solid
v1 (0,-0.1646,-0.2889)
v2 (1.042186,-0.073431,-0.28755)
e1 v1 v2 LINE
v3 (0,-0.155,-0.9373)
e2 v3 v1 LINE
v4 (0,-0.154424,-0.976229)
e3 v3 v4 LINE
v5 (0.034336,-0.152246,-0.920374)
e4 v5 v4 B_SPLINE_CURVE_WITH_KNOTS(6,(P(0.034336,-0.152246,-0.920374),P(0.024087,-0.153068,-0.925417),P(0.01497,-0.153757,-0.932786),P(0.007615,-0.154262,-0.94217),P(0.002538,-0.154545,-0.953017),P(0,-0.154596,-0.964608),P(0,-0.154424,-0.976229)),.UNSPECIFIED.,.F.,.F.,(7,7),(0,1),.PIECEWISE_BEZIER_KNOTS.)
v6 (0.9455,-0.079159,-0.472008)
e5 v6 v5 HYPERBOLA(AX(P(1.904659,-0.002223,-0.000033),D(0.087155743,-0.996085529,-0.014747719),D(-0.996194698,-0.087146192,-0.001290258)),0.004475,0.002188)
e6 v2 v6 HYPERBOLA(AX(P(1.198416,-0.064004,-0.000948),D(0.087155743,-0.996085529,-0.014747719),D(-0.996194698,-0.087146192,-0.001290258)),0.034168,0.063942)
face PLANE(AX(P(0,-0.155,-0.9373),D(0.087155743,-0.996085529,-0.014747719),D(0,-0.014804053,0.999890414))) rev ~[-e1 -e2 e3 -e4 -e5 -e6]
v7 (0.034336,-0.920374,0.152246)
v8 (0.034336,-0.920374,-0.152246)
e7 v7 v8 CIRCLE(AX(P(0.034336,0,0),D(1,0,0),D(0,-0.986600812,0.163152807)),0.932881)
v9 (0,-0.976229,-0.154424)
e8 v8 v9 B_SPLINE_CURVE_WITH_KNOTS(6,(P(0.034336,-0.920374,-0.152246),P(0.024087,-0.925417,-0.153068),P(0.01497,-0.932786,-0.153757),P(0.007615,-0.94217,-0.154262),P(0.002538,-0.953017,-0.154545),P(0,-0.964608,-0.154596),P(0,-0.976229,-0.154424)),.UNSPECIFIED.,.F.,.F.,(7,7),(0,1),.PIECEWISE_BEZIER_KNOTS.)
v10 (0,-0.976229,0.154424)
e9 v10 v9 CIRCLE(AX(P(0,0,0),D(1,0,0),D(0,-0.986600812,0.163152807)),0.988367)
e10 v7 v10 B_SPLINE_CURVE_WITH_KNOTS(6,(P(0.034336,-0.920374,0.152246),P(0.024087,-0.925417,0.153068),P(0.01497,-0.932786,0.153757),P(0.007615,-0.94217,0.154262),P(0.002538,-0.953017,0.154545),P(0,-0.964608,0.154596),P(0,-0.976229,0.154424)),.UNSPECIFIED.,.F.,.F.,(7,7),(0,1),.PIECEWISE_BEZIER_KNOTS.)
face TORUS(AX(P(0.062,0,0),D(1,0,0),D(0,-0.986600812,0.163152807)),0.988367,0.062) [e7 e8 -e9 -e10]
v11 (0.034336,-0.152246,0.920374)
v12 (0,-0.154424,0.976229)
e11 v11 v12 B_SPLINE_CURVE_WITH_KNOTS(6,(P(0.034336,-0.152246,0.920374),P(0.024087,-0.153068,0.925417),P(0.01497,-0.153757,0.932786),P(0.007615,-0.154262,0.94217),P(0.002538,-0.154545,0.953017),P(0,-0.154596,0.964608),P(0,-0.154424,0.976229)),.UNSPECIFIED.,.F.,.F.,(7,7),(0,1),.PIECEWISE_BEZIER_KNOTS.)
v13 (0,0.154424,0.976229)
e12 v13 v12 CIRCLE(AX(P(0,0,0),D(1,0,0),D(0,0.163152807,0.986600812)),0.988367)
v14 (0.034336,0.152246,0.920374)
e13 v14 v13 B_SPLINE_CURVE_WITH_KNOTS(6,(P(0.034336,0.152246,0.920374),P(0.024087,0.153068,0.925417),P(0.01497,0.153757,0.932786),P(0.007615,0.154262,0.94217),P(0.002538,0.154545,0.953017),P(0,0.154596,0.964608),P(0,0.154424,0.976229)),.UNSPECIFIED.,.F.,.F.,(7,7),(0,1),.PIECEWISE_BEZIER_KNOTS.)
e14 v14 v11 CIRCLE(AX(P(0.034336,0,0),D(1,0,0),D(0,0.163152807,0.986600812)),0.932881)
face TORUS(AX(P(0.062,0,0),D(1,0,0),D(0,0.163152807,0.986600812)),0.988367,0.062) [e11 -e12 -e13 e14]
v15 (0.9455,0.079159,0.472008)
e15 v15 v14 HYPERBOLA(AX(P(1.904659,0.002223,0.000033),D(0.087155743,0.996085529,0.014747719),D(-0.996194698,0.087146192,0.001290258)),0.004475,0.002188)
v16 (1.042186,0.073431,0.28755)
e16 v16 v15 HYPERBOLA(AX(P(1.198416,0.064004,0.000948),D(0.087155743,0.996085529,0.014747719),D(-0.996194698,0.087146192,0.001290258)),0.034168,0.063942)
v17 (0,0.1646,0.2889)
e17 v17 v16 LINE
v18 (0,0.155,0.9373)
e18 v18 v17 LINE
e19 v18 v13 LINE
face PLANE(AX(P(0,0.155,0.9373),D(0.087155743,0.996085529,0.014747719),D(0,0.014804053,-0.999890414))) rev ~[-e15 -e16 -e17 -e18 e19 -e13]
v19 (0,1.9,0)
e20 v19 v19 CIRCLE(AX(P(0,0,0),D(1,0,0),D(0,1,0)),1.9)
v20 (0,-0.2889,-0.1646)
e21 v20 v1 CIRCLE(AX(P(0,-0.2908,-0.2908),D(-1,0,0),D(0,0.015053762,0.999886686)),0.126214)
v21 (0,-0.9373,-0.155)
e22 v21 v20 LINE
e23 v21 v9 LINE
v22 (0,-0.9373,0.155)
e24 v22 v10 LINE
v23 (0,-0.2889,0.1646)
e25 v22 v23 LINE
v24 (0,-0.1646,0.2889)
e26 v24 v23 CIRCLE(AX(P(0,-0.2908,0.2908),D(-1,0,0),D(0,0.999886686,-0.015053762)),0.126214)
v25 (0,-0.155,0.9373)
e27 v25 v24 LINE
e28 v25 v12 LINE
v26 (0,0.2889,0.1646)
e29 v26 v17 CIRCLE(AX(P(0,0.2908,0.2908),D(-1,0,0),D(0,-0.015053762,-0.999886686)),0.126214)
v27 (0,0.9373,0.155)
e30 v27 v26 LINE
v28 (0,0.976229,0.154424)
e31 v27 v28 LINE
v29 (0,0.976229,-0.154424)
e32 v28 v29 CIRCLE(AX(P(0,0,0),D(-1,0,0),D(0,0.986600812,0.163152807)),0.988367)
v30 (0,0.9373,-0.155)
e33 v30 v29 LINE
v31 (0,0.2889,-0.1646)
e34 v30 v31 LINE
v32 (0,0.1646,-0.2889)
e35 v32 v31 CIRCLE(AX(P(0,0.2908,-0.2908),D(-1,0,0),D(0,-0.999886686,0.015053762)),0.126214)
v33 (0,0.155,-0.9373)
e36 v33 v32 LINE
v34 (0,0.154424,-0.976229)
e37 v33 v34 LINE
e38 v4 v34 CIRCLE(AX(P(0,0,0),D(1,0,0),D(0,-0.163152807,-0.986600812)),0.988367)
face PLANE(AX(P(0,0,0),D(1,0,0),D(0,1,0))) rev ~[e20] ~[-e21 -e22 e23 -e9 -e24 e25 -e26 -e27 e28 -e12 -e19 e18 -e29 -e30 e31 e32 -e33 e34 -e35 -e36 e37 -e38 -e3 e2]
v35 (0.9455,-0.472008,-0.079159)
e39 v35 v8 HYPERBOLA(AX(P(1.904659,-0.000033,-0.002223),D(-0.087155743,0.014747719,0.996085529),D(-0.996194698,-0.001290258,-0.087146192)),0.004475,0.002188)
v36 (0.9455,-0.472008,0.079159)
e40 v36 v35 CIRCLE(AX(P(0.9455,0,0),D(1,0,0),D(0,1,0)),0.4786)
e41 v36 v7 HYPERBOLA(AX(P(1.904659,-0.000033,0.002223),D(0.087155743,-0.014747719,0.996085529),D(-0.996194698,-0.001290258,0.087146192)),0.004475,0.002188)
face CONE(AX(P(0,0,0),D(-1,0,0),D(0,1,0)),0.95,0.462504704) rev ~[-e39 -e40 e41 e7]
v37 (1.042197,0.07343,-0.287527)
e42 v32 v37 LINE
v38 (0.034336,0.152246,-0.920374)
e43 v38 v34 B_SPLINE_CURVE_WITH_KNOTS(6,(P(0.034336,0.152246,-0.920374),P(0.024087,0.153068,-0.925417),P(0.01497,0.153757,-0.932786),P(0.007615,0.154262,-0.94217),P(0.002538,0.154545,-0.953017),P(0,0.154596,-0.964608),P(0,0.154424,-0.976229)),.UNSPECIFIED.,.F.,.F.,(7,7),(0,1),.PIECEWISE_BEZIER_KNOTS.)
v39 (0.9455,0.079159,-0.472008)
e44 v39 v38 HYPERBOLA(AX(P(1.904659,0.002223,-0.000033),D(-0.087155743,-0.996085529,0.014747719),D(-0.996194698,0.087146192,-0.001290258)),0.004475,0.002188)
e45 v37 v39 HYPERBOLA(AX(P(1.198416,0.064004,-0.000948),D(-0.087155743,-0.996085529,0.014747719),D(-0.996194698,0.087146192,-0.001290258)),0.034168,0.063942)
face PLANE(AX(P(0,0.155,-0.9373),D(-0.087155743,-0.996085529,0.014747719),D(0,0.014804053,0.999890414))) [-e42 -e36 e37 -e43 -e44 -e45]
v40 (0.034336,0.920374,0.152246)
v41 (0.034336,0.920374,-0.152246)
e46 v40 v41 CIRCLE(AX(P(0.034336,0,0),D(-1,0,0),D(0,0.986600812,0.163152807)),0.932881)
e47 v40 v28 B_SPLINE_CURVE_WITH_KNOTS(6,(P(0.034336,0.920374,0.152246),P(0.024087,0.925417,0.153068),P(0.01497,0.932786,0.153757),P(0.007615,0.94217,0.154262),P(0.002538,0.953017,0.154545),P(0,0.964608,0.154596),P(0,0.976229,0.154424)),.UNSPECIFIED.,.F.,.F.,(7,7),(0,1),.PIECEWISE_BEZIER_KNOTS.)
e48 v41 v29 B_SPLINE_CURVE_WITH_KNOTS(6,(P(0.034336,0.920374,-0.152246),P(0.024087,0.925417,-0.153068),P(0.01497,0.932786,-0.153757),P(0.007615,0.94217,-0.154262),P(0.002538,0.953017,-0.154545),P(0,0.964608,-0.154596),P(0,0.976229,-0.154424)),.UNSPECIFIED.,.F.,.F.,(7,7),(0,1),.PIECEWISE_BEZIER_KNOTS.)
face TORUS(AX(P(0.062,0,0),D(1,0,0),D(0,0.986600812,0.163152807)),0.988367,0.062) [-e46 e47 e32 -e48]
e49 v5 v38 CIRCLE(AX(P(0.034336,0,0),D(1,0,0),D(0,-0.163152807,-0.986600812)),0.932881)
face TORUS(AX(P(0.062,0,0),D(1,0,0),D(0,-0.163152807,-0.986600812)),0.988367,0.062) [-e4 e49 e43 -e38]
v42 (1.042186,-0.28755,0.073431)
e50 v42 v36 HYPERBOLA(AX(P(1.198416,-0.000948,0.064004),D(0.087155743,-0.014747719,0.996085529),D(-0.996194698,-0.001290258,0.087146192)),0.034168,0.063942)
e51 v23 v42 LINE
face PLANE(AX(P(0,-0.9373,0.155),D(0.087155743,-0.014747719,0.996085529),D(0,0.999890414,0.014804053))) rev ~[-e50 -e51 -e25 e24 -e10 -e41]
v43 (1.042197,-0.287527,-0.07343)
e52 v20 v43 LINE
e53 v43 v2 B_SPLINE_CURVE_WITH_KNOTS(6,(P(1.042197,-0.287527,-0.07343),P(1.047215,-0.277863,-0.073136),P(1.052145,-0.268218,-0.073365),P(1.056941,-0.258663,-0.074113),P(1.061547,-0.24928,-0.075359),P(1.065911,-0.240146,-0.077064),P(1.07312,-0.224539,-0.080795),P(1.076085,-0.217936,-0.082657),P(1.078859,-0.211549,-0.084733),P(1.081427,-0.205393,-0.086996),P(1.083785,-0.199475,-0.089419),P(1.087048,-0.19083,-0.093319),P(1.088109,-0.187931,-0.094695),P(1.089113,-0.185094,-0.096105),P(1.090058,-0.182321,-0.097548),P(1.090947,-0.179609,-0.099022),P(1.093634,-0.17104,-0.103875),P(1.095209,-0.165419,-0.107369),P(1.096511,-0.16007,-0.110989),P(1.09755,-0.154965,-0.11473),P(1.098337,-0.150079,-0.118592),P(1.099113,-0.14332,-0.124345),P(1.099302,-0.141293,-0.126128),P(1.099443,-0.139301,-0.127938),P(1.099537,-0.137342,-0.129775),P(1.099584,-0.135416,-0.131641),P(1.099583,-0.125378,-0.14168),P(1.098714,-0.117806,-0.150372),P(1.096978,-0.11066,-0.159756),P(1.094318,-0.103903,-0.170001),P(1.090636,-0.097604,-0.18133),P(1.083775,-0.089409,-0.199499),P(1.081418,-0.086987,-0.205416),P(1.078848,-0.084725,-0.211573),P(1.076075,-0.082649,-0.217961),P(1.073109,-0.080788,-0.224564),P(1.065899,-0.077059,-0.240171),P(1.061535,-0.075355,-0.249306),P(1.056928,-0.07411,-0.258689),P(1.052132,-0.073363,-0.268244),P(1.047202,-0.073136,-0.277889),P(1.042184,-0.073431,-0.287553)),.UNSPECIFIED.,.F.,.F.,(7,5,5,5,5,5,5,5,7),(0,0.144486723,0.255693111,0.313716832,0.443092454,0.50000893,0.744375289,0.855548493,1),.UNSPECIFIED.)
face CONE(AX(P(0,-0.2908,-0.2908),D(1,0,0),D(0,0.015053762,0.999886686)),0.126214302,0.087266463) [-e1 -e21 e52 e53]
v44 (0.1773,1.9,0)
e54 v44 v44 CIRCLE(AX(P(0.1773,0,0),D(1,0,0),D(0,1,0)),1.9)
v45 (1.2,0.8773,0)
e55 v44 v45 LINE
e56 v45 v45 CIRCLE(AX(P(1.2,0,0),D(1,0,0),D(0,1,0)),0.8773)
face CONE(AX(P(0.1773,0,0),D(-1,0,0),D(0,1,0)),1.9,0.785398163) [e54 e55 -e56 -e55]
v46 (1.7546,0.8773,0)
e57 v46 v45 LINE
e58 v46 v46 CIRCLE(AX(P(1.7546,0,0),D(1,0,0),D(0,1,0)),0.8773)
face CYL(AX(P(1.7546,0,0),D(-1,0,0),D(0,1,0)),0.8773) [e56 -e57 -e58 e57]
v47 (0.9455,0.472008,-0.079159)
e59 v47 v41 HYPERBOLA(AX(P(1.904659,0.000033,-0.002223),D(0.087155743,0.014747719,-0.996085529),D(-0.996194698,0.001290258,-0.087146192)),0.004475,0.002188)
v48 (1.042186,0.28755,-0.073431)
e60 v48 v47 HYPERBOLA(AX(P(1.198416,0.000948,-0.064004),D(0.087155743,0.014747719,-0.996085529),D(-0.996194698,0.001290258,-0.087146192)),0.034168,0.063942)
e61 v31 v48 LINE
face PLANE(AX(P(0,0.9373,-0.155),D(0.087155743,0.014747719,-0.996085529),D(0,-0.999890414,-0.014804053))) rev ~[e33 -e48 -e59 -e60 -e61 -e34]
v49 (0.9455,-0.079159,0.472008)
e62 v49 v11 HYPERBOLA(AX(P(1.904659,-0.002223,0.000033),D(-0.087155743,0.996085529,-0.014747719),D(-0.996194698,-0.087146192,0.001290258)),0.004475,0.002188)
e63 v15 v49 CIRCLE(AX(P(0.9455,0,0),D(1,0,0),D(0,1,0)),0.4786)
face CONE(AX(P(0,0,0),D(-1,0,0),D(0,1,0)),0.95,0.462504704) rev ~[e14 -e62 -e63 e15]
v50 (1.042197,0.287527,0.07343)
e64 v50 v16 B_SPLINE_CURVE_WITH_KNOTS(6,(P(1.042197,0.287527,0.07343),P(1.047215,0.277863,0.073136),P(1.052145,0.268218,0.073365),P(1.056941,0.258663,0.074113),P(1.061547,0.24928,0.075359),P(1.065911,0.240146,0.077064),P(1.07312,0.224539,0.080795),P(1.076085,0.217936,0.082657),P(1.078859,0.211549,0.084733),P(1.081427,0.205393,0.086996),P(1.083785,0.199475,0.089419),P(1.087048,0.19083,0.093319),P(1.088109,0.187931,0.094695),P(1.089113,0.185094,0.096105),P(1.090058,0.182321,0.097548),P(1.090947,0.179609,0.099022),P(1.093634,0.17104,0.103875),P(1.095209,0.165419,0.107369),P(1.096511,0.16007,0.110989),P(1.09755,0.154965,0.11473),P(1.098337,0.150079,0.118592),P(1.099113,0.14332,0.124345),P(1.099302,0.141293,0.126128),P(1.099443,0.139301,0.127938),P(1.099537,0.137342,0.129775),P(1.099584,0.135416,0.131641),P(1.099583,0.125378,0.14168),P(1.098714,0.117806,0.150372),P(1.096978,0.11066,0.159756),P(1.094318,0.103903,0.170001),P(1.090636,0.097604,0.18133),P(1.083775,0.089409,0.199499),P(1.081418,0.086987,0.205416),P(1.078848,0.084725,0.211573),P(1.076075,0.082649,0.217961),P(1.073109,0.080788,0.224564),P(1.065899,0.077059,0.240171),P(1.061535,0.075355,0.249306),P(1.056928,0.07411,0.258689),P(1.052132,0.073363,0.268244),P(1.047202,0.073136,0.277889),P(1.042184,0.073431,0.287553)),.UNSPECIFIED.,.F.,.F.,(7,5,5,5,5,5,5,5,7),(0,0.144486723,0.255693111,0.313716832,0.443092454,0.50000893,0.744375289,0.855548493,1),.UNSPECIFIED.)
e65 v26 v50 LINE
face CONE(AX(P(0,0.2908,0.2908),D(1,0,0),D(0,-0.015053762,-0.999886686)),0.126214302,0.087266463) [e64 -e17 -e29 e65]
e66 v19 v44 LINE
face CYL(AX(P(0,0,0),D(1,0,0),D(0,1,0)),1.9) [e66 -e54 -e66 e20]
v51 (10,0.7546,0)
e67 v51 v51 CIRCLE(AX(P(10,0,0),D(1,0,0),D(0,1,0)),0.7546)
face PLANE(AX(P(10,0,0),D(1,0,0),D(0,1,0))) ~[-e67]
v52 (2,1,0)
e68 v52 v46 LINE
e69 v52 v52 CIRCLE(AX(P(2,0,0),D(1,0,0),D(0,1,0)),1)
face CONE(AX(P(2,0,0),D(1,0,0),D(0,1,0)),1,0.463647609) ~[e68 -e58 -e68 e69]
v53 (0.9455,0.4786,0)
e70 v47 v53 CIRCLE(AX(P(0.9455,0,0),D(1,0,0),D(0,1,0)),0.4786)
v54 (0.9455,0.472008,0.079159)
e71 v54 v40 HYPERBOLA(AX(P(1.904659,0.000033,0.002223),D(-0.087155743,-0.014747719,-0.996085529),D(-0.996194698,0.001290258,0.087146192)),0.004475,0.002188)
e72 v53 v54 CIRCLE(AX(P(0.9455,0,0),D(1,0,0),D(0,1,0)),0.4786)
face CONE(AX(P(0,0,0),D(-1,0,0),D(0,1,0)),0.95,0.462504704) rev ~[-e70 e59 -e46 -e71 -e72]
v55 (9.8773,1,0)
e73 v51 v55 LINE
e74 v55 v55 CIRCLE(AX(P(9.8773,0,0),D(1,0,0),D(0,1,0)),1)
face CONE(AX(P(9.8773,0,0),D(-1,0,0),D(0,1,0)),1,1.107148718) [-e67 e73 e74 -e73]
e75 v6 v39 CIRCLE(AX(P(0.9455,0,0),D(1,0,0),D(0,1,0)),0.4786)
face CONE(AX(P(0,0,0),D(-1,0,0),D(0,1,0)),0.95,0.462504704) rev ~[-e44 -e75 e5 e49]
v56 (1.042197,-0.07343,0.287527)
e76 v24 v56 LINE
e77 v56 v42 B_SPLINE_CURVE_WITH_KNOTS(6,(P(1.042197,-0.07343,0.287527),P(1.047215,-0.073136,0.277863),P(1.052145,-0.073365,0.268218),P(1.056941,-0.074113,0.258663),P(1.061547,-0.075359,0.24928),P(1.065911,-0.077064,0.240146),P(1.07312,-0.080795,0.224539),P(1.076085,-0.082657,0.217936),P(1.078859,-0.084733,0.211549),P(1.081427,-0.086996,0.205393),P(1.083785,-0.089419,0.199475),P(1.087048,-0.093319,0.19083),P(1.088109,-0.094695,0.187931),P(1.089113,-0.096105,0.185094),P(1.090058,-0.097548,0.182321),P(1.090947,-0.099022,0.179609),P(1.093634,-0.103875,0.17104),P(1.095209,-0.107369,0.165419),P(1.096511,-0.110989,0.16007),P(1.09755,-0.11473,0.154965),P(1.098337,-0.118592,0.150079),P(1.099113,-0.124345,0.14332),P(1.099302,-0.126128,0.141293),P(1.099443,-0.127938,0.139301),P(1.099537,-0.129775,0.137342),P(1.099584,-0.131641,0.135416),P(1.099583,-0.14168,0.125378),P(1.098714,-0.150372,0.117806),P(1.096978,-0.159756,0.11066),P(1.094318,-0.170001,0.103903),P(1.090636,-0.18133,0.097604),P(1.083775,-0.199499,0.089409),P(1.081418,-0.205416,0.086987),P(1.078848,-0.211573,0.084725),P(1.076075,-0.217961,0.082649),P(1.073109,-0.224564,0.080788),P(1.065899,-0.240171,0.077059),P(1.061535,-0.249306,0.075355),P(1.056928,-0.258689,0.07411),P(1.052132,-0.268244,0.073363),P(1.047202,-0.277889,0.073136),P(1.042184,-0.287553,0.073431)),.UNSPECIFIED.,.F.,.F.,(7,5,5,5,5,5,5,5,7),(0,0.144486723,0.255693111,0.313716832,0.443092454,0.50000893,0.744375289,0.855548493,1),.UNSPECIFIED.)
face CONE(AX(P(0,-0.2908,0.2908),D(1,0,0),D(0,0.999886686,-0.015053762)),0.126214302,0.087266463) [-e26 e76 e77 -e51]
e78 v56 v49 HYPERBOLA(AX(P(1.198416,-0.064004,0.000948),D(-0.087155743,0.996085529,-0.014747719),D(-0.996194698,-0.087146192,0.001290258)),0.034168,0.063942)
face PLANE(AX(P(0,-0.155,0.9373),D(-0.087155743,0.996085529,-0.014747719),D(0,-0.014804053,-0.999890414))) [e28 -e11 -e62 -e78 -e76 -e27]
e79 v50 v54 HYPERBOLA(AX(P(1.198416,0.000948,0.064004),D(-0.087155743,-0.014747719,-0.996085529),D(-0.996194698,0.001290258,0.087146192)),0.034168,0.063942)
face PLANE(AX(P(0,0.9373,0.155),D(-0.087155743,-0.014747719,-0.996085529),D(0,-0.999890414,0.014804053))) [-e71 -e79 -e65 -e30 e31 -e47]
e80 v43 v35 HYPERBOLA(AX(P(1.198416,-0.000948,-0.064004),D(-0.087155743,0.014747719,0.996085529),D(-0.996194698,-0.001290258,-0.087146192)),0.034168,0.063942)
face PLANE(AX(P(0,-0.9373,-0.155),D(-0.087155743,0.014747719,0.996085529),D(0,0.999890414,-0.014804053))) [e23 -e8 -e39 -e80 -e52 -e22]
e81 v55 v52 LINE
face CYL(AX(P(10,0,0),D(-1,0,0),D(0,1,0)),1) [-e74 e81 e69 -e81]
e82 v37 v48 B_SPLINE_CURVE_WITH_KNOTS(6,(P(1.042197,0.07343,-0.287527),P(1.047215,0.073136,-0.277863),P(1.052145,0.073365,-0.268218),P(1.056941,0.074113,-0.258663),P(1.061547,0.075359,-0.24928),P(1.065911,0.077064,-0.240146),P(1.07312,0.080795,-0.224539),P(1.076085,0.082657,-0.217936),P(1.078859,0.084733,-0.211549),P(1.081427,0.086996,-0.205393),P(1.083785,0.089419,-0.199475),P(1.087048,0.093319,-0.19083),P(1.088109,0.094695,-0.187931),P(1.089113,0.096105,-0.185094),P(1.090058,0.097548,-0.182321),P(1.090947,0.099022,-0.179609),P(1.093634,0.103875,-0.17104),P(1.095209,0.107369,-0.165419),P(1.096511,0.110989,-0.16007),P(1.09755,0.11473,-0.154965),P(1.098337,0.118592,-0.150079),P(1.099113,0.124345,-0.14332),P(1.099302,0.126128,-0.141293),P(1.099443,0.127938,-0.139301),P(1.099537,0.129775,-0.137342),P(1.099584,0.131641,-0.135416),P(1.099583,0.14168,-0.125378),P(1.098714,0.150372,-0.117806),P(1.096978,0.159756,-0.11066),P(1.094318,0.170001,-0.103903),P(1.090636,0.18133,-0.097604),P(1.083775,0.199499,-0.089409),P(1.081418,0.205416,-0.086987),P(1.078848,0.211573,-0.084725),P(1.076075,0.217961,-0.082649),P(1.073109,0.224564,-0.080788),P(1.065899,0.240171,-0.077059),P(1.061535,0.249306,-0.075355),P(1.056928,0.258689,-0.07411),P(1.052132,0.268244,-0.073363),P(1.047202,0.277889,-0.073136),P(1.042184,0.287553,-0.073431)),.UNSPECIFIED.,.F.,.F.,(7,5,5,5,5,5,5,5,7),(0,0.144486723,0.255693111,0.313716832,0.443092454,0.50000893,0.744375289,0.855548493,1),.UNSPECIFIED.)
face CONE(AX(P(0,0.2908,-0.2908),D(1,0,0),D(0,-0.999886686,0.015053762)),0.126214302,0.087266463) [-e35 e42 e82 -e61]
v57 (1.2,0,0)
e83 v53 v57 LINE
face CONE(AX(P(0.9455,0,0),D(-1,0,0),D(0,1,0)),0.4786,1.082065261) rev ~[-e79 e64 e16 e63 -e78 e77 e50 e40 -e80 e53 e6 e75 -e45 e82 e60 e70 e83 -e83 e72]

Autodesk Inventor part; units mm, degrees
ref_plane "YZ Plane" through (0, 0, 0) normal (1, 0, 0) x (0, 1, 0)
ref_plane "XZ Plane" through (0, 0, 0) normal (0, 1, 0) x (-1, 0, 0)
sketch "Sketch1" plane through (0, 0, 0) normal (0, 0, 1) x (1, 0, 0)
  line L0 (1.2, 0) -> (10, 0)
  line L1 (10, 0) -> (10, 1)
  line L2 (10, 1) -> (2, 1)
  line L3 (2, 1) -> (1.7546, 0.8773)
  line L4 (1.7546, 0.8773) -> (1.2, 0.8773)
  line L5 (0, 1.9) -> (0, 0.95)
  line L6 (0, 0.95) -> (0.9455, 0.4786)
  line L7 (0.9455, 0.4786) -> (1.2, 0)
  line L8 (-2, 0) -> (12, 0) projected
  line L9 (0, -0.38) -> (0, 2.28) projected
  line L10 (0, 1.9) -> (0.1773, 1.9)
  line L11 (0.1773, 1.9) -> (1.2, 0.8773)
  line L12 (2, 1) -> (1.0773, 1) construction
  dimension "d1" = 8
  dimension "d2" = 2
  dimension "d3" = 1.7546
  dimension "d4" = 1.9
  dimension "d5" = 26.5
  dimension "d6" = 62
  dimension "d7" = 1.2
  dimension "d8" = 0.2454
  dimension "d12" = 3.8
  dimension "d13" = 45
  dimension "d15" = 10
  dimension "d24" = 1.2
revolve "Body" add sketch "Sketch1" angle 360 about axis through (1.2, 0, 0) along (1, 0, 0) contours L7 L6 L5 L10 L11 L4 L3 L2 L1 L0
sketch "Sketch2" plane through (0, 0, 0) normal (-1, 0, 0) x (0, 0, 1)
  line L0 (0, 0.95) -> (0, 0) construction
  line L1 (0, 0) -> (0.95, 0) construction
  arc A0 (0.285, 0) -> (0, 0.285) centre (0, 0) ccw construction
  arc A1 (0.3325, 0) -> (0, 0.3325) centre (0, 0) ccw construction
  arc A2 (0.9373, 0.155) -> (0.155, 0.9373) centre (0, 0) ccw
  line L2 (0, 0) -> (0.6718, 0.6718) construction
  line L3 (0.155, 0.9373) -> (0.1646, 0.2889)
  line L4 (0.9373, 0.155) -> (0.2889, 0.1646)
  arc A3 (0.155, 0.9373) -> (0, 0.95) centre (0, 0) ccw
  arc A4 (0.95, 0) -> (0.9373, 0.155) centre (0, 0) ccw
  line L5 (0, -2.66) -> (0, 2.66) projected
  line L6 (-2.66, 0) -> (2.66, 0) projected
  arc A5 (0.155, -0.9373) -> (0.9373, -0.155) centre (0, 0) ccw
  line L7 (0.155, -0.9373) -> (0.1646, -0.2889)
  line L8 (0.9373, -0.155) -> (0.2889, -0.1646)
  arc A6 (0, -0.95) -> (0.155, -0.9373) centre (0, 0) ccw
  arc A7 (0.9373, -0.155) -> (0.95, 0) centre (0, 0) ccw
  arc A8 (-0.155, 0.9373) -> (-0.9373, 0.155) centre (0, 0) ccw
  line L9 (-0.155, 0.9373) -> (-0.1646, 0.2889)
  line L10 (-0.9373, 0.155) -> (-0.2889, 0.1646)
  arc A9 (0, 0.95) -> (-0.155, 0.9373) centre (0, 0) ccw
  arc A10 (-0.9373, 0.155) -> (-0.95, 0) centre (0, 0) ccw
  arc A11 (-0.155, -0.9373) -> (0, -0.95) centre (0, 0) ccw
  arc A12 (-0.9373, -0.155) -> (-0.155, -0.9373) centre (0, 0) ccw
  arc A13 (-0.95, 0) -> (-0.9373, -0.155) centre (0, 0) ccw
  line L11 (-0.9373, -0.155) -> (-0.2889, -0.1646)
  line L12 (-0.155, -0.9373) -> (-0.1646, -0.2889)
  arc A14 (0.1646, 0.2889) -> (0.2889, 0.1646) centre (0.2908, 0.2908) ccw
  arc A15 (0.2889, -0.1646) -> (0.1646, -0.2889) centre (0.2908, -0.2908) ccw
  arc A16 (-0.2889, 0.1646) -> (-0.1646, 0.2889) centre (-0.2908, 0.2908) ccw
  arc A17 (-0.1646, -0.2889) -> (-0.2889, -0.1646) centre (-0.2908, -0.2908) ccw
  point P0 (0.6718, -0.6718)
  point P1 (-0.6718, 0.6718)
  point P2 (-0.6718, -0.6718)
  dimension "d17" = 0.57
  dimension "d18" = 0.665
  dimension "d19" = 1.9
  dimension "d20" = 45
  dimension "d21" = 0.155
extrude "Slot" add sketch "Sketch2" against normal up to next draft 5 contours L4 A14 L3 A2 | A5 L7 A15 L8 | L9 A16 L10 A8 | A12 L11 A17 L12
fillet "Fillet1" radius 0.062 4 edges at (0, 0.95, 0) (0, 0, -0.95) (0, -0.95, 0) (0, 0, 0.95)
thread "Thread" size "M2x0.4" class "6g" standard "ISO Metric profile" length 8
chamfer "Chamfer1" distance 0.2454 distance2 0.1227 1 edges at (10, -1, 0) measured on face at (10, -0.0858, 0.7069)
ref_plane "Work Plane2" through (3.35, 0, 0) normal (0, 0, -1) x (1, 0, 0)
equation "\"d1\" = GEL"
equation "\"d2\" = GD"
equation "\"d3\" = BDM"
equation "\"d4\" = SDM"
equation "\"d7\" = INTI"
equation "\"d8\" = GAL"
equation "\"d12\" = KOD"
equation "\"d13\" = 0.5 * SEWI"
equation "\"d15\" = NLG"
equation "\"d24\" = KOH"
equation "\"d17\" = 0.3 * SDM"
equation "\"d18\" = 0.35 * SDM"
equation "\"d19\" = SDM"
equation "\"d21\" = 0.5 * SBR"
equation "\"d23\" = 0.2 * SBR"
equation "\"d10\" = GEL"
equation "\"d25\" = -0.5 * SPD + 0.5 * GD"
equation "\"d26\" = 0.5 * GAL"
equation "\"NLG\" = 10"
equation "\"GEL\" = 8"
equation "\"GAL\" = 0.61345 * PTC"
equation "\"SPD\" = NND - 1.2269 * PTC"
equation "\"KOD\" = 3.8"
equation "\"KOH\" = 1.2"
equation "\"SBR\" = 0.31"
equation "\"INTI\" = 1.2"
equation "\"SDM\" = 1.9"
equation "\"GD\" = NND"
equation "\"BDM\" = NND - GAL"
equation "\"SEWI\" = 90deg"
equation "\"d9\" = SDM"
equation "\"GUL\" = 0.61345 * PTC"
equation "\"TOA\" = 30deg"
equation "\"EPV\" = 2.2"
equation "\"THREADDIA\" = 2"
equation "\"PTC\" = 0.4"
equation "\"NND\" = 2"
equation "\"GD1\" = THREADDIA - 1.2269 * PTC"
properties part number "ISO 7046-1 - M2 x 10 - 4.8 - H" material "Steel"
